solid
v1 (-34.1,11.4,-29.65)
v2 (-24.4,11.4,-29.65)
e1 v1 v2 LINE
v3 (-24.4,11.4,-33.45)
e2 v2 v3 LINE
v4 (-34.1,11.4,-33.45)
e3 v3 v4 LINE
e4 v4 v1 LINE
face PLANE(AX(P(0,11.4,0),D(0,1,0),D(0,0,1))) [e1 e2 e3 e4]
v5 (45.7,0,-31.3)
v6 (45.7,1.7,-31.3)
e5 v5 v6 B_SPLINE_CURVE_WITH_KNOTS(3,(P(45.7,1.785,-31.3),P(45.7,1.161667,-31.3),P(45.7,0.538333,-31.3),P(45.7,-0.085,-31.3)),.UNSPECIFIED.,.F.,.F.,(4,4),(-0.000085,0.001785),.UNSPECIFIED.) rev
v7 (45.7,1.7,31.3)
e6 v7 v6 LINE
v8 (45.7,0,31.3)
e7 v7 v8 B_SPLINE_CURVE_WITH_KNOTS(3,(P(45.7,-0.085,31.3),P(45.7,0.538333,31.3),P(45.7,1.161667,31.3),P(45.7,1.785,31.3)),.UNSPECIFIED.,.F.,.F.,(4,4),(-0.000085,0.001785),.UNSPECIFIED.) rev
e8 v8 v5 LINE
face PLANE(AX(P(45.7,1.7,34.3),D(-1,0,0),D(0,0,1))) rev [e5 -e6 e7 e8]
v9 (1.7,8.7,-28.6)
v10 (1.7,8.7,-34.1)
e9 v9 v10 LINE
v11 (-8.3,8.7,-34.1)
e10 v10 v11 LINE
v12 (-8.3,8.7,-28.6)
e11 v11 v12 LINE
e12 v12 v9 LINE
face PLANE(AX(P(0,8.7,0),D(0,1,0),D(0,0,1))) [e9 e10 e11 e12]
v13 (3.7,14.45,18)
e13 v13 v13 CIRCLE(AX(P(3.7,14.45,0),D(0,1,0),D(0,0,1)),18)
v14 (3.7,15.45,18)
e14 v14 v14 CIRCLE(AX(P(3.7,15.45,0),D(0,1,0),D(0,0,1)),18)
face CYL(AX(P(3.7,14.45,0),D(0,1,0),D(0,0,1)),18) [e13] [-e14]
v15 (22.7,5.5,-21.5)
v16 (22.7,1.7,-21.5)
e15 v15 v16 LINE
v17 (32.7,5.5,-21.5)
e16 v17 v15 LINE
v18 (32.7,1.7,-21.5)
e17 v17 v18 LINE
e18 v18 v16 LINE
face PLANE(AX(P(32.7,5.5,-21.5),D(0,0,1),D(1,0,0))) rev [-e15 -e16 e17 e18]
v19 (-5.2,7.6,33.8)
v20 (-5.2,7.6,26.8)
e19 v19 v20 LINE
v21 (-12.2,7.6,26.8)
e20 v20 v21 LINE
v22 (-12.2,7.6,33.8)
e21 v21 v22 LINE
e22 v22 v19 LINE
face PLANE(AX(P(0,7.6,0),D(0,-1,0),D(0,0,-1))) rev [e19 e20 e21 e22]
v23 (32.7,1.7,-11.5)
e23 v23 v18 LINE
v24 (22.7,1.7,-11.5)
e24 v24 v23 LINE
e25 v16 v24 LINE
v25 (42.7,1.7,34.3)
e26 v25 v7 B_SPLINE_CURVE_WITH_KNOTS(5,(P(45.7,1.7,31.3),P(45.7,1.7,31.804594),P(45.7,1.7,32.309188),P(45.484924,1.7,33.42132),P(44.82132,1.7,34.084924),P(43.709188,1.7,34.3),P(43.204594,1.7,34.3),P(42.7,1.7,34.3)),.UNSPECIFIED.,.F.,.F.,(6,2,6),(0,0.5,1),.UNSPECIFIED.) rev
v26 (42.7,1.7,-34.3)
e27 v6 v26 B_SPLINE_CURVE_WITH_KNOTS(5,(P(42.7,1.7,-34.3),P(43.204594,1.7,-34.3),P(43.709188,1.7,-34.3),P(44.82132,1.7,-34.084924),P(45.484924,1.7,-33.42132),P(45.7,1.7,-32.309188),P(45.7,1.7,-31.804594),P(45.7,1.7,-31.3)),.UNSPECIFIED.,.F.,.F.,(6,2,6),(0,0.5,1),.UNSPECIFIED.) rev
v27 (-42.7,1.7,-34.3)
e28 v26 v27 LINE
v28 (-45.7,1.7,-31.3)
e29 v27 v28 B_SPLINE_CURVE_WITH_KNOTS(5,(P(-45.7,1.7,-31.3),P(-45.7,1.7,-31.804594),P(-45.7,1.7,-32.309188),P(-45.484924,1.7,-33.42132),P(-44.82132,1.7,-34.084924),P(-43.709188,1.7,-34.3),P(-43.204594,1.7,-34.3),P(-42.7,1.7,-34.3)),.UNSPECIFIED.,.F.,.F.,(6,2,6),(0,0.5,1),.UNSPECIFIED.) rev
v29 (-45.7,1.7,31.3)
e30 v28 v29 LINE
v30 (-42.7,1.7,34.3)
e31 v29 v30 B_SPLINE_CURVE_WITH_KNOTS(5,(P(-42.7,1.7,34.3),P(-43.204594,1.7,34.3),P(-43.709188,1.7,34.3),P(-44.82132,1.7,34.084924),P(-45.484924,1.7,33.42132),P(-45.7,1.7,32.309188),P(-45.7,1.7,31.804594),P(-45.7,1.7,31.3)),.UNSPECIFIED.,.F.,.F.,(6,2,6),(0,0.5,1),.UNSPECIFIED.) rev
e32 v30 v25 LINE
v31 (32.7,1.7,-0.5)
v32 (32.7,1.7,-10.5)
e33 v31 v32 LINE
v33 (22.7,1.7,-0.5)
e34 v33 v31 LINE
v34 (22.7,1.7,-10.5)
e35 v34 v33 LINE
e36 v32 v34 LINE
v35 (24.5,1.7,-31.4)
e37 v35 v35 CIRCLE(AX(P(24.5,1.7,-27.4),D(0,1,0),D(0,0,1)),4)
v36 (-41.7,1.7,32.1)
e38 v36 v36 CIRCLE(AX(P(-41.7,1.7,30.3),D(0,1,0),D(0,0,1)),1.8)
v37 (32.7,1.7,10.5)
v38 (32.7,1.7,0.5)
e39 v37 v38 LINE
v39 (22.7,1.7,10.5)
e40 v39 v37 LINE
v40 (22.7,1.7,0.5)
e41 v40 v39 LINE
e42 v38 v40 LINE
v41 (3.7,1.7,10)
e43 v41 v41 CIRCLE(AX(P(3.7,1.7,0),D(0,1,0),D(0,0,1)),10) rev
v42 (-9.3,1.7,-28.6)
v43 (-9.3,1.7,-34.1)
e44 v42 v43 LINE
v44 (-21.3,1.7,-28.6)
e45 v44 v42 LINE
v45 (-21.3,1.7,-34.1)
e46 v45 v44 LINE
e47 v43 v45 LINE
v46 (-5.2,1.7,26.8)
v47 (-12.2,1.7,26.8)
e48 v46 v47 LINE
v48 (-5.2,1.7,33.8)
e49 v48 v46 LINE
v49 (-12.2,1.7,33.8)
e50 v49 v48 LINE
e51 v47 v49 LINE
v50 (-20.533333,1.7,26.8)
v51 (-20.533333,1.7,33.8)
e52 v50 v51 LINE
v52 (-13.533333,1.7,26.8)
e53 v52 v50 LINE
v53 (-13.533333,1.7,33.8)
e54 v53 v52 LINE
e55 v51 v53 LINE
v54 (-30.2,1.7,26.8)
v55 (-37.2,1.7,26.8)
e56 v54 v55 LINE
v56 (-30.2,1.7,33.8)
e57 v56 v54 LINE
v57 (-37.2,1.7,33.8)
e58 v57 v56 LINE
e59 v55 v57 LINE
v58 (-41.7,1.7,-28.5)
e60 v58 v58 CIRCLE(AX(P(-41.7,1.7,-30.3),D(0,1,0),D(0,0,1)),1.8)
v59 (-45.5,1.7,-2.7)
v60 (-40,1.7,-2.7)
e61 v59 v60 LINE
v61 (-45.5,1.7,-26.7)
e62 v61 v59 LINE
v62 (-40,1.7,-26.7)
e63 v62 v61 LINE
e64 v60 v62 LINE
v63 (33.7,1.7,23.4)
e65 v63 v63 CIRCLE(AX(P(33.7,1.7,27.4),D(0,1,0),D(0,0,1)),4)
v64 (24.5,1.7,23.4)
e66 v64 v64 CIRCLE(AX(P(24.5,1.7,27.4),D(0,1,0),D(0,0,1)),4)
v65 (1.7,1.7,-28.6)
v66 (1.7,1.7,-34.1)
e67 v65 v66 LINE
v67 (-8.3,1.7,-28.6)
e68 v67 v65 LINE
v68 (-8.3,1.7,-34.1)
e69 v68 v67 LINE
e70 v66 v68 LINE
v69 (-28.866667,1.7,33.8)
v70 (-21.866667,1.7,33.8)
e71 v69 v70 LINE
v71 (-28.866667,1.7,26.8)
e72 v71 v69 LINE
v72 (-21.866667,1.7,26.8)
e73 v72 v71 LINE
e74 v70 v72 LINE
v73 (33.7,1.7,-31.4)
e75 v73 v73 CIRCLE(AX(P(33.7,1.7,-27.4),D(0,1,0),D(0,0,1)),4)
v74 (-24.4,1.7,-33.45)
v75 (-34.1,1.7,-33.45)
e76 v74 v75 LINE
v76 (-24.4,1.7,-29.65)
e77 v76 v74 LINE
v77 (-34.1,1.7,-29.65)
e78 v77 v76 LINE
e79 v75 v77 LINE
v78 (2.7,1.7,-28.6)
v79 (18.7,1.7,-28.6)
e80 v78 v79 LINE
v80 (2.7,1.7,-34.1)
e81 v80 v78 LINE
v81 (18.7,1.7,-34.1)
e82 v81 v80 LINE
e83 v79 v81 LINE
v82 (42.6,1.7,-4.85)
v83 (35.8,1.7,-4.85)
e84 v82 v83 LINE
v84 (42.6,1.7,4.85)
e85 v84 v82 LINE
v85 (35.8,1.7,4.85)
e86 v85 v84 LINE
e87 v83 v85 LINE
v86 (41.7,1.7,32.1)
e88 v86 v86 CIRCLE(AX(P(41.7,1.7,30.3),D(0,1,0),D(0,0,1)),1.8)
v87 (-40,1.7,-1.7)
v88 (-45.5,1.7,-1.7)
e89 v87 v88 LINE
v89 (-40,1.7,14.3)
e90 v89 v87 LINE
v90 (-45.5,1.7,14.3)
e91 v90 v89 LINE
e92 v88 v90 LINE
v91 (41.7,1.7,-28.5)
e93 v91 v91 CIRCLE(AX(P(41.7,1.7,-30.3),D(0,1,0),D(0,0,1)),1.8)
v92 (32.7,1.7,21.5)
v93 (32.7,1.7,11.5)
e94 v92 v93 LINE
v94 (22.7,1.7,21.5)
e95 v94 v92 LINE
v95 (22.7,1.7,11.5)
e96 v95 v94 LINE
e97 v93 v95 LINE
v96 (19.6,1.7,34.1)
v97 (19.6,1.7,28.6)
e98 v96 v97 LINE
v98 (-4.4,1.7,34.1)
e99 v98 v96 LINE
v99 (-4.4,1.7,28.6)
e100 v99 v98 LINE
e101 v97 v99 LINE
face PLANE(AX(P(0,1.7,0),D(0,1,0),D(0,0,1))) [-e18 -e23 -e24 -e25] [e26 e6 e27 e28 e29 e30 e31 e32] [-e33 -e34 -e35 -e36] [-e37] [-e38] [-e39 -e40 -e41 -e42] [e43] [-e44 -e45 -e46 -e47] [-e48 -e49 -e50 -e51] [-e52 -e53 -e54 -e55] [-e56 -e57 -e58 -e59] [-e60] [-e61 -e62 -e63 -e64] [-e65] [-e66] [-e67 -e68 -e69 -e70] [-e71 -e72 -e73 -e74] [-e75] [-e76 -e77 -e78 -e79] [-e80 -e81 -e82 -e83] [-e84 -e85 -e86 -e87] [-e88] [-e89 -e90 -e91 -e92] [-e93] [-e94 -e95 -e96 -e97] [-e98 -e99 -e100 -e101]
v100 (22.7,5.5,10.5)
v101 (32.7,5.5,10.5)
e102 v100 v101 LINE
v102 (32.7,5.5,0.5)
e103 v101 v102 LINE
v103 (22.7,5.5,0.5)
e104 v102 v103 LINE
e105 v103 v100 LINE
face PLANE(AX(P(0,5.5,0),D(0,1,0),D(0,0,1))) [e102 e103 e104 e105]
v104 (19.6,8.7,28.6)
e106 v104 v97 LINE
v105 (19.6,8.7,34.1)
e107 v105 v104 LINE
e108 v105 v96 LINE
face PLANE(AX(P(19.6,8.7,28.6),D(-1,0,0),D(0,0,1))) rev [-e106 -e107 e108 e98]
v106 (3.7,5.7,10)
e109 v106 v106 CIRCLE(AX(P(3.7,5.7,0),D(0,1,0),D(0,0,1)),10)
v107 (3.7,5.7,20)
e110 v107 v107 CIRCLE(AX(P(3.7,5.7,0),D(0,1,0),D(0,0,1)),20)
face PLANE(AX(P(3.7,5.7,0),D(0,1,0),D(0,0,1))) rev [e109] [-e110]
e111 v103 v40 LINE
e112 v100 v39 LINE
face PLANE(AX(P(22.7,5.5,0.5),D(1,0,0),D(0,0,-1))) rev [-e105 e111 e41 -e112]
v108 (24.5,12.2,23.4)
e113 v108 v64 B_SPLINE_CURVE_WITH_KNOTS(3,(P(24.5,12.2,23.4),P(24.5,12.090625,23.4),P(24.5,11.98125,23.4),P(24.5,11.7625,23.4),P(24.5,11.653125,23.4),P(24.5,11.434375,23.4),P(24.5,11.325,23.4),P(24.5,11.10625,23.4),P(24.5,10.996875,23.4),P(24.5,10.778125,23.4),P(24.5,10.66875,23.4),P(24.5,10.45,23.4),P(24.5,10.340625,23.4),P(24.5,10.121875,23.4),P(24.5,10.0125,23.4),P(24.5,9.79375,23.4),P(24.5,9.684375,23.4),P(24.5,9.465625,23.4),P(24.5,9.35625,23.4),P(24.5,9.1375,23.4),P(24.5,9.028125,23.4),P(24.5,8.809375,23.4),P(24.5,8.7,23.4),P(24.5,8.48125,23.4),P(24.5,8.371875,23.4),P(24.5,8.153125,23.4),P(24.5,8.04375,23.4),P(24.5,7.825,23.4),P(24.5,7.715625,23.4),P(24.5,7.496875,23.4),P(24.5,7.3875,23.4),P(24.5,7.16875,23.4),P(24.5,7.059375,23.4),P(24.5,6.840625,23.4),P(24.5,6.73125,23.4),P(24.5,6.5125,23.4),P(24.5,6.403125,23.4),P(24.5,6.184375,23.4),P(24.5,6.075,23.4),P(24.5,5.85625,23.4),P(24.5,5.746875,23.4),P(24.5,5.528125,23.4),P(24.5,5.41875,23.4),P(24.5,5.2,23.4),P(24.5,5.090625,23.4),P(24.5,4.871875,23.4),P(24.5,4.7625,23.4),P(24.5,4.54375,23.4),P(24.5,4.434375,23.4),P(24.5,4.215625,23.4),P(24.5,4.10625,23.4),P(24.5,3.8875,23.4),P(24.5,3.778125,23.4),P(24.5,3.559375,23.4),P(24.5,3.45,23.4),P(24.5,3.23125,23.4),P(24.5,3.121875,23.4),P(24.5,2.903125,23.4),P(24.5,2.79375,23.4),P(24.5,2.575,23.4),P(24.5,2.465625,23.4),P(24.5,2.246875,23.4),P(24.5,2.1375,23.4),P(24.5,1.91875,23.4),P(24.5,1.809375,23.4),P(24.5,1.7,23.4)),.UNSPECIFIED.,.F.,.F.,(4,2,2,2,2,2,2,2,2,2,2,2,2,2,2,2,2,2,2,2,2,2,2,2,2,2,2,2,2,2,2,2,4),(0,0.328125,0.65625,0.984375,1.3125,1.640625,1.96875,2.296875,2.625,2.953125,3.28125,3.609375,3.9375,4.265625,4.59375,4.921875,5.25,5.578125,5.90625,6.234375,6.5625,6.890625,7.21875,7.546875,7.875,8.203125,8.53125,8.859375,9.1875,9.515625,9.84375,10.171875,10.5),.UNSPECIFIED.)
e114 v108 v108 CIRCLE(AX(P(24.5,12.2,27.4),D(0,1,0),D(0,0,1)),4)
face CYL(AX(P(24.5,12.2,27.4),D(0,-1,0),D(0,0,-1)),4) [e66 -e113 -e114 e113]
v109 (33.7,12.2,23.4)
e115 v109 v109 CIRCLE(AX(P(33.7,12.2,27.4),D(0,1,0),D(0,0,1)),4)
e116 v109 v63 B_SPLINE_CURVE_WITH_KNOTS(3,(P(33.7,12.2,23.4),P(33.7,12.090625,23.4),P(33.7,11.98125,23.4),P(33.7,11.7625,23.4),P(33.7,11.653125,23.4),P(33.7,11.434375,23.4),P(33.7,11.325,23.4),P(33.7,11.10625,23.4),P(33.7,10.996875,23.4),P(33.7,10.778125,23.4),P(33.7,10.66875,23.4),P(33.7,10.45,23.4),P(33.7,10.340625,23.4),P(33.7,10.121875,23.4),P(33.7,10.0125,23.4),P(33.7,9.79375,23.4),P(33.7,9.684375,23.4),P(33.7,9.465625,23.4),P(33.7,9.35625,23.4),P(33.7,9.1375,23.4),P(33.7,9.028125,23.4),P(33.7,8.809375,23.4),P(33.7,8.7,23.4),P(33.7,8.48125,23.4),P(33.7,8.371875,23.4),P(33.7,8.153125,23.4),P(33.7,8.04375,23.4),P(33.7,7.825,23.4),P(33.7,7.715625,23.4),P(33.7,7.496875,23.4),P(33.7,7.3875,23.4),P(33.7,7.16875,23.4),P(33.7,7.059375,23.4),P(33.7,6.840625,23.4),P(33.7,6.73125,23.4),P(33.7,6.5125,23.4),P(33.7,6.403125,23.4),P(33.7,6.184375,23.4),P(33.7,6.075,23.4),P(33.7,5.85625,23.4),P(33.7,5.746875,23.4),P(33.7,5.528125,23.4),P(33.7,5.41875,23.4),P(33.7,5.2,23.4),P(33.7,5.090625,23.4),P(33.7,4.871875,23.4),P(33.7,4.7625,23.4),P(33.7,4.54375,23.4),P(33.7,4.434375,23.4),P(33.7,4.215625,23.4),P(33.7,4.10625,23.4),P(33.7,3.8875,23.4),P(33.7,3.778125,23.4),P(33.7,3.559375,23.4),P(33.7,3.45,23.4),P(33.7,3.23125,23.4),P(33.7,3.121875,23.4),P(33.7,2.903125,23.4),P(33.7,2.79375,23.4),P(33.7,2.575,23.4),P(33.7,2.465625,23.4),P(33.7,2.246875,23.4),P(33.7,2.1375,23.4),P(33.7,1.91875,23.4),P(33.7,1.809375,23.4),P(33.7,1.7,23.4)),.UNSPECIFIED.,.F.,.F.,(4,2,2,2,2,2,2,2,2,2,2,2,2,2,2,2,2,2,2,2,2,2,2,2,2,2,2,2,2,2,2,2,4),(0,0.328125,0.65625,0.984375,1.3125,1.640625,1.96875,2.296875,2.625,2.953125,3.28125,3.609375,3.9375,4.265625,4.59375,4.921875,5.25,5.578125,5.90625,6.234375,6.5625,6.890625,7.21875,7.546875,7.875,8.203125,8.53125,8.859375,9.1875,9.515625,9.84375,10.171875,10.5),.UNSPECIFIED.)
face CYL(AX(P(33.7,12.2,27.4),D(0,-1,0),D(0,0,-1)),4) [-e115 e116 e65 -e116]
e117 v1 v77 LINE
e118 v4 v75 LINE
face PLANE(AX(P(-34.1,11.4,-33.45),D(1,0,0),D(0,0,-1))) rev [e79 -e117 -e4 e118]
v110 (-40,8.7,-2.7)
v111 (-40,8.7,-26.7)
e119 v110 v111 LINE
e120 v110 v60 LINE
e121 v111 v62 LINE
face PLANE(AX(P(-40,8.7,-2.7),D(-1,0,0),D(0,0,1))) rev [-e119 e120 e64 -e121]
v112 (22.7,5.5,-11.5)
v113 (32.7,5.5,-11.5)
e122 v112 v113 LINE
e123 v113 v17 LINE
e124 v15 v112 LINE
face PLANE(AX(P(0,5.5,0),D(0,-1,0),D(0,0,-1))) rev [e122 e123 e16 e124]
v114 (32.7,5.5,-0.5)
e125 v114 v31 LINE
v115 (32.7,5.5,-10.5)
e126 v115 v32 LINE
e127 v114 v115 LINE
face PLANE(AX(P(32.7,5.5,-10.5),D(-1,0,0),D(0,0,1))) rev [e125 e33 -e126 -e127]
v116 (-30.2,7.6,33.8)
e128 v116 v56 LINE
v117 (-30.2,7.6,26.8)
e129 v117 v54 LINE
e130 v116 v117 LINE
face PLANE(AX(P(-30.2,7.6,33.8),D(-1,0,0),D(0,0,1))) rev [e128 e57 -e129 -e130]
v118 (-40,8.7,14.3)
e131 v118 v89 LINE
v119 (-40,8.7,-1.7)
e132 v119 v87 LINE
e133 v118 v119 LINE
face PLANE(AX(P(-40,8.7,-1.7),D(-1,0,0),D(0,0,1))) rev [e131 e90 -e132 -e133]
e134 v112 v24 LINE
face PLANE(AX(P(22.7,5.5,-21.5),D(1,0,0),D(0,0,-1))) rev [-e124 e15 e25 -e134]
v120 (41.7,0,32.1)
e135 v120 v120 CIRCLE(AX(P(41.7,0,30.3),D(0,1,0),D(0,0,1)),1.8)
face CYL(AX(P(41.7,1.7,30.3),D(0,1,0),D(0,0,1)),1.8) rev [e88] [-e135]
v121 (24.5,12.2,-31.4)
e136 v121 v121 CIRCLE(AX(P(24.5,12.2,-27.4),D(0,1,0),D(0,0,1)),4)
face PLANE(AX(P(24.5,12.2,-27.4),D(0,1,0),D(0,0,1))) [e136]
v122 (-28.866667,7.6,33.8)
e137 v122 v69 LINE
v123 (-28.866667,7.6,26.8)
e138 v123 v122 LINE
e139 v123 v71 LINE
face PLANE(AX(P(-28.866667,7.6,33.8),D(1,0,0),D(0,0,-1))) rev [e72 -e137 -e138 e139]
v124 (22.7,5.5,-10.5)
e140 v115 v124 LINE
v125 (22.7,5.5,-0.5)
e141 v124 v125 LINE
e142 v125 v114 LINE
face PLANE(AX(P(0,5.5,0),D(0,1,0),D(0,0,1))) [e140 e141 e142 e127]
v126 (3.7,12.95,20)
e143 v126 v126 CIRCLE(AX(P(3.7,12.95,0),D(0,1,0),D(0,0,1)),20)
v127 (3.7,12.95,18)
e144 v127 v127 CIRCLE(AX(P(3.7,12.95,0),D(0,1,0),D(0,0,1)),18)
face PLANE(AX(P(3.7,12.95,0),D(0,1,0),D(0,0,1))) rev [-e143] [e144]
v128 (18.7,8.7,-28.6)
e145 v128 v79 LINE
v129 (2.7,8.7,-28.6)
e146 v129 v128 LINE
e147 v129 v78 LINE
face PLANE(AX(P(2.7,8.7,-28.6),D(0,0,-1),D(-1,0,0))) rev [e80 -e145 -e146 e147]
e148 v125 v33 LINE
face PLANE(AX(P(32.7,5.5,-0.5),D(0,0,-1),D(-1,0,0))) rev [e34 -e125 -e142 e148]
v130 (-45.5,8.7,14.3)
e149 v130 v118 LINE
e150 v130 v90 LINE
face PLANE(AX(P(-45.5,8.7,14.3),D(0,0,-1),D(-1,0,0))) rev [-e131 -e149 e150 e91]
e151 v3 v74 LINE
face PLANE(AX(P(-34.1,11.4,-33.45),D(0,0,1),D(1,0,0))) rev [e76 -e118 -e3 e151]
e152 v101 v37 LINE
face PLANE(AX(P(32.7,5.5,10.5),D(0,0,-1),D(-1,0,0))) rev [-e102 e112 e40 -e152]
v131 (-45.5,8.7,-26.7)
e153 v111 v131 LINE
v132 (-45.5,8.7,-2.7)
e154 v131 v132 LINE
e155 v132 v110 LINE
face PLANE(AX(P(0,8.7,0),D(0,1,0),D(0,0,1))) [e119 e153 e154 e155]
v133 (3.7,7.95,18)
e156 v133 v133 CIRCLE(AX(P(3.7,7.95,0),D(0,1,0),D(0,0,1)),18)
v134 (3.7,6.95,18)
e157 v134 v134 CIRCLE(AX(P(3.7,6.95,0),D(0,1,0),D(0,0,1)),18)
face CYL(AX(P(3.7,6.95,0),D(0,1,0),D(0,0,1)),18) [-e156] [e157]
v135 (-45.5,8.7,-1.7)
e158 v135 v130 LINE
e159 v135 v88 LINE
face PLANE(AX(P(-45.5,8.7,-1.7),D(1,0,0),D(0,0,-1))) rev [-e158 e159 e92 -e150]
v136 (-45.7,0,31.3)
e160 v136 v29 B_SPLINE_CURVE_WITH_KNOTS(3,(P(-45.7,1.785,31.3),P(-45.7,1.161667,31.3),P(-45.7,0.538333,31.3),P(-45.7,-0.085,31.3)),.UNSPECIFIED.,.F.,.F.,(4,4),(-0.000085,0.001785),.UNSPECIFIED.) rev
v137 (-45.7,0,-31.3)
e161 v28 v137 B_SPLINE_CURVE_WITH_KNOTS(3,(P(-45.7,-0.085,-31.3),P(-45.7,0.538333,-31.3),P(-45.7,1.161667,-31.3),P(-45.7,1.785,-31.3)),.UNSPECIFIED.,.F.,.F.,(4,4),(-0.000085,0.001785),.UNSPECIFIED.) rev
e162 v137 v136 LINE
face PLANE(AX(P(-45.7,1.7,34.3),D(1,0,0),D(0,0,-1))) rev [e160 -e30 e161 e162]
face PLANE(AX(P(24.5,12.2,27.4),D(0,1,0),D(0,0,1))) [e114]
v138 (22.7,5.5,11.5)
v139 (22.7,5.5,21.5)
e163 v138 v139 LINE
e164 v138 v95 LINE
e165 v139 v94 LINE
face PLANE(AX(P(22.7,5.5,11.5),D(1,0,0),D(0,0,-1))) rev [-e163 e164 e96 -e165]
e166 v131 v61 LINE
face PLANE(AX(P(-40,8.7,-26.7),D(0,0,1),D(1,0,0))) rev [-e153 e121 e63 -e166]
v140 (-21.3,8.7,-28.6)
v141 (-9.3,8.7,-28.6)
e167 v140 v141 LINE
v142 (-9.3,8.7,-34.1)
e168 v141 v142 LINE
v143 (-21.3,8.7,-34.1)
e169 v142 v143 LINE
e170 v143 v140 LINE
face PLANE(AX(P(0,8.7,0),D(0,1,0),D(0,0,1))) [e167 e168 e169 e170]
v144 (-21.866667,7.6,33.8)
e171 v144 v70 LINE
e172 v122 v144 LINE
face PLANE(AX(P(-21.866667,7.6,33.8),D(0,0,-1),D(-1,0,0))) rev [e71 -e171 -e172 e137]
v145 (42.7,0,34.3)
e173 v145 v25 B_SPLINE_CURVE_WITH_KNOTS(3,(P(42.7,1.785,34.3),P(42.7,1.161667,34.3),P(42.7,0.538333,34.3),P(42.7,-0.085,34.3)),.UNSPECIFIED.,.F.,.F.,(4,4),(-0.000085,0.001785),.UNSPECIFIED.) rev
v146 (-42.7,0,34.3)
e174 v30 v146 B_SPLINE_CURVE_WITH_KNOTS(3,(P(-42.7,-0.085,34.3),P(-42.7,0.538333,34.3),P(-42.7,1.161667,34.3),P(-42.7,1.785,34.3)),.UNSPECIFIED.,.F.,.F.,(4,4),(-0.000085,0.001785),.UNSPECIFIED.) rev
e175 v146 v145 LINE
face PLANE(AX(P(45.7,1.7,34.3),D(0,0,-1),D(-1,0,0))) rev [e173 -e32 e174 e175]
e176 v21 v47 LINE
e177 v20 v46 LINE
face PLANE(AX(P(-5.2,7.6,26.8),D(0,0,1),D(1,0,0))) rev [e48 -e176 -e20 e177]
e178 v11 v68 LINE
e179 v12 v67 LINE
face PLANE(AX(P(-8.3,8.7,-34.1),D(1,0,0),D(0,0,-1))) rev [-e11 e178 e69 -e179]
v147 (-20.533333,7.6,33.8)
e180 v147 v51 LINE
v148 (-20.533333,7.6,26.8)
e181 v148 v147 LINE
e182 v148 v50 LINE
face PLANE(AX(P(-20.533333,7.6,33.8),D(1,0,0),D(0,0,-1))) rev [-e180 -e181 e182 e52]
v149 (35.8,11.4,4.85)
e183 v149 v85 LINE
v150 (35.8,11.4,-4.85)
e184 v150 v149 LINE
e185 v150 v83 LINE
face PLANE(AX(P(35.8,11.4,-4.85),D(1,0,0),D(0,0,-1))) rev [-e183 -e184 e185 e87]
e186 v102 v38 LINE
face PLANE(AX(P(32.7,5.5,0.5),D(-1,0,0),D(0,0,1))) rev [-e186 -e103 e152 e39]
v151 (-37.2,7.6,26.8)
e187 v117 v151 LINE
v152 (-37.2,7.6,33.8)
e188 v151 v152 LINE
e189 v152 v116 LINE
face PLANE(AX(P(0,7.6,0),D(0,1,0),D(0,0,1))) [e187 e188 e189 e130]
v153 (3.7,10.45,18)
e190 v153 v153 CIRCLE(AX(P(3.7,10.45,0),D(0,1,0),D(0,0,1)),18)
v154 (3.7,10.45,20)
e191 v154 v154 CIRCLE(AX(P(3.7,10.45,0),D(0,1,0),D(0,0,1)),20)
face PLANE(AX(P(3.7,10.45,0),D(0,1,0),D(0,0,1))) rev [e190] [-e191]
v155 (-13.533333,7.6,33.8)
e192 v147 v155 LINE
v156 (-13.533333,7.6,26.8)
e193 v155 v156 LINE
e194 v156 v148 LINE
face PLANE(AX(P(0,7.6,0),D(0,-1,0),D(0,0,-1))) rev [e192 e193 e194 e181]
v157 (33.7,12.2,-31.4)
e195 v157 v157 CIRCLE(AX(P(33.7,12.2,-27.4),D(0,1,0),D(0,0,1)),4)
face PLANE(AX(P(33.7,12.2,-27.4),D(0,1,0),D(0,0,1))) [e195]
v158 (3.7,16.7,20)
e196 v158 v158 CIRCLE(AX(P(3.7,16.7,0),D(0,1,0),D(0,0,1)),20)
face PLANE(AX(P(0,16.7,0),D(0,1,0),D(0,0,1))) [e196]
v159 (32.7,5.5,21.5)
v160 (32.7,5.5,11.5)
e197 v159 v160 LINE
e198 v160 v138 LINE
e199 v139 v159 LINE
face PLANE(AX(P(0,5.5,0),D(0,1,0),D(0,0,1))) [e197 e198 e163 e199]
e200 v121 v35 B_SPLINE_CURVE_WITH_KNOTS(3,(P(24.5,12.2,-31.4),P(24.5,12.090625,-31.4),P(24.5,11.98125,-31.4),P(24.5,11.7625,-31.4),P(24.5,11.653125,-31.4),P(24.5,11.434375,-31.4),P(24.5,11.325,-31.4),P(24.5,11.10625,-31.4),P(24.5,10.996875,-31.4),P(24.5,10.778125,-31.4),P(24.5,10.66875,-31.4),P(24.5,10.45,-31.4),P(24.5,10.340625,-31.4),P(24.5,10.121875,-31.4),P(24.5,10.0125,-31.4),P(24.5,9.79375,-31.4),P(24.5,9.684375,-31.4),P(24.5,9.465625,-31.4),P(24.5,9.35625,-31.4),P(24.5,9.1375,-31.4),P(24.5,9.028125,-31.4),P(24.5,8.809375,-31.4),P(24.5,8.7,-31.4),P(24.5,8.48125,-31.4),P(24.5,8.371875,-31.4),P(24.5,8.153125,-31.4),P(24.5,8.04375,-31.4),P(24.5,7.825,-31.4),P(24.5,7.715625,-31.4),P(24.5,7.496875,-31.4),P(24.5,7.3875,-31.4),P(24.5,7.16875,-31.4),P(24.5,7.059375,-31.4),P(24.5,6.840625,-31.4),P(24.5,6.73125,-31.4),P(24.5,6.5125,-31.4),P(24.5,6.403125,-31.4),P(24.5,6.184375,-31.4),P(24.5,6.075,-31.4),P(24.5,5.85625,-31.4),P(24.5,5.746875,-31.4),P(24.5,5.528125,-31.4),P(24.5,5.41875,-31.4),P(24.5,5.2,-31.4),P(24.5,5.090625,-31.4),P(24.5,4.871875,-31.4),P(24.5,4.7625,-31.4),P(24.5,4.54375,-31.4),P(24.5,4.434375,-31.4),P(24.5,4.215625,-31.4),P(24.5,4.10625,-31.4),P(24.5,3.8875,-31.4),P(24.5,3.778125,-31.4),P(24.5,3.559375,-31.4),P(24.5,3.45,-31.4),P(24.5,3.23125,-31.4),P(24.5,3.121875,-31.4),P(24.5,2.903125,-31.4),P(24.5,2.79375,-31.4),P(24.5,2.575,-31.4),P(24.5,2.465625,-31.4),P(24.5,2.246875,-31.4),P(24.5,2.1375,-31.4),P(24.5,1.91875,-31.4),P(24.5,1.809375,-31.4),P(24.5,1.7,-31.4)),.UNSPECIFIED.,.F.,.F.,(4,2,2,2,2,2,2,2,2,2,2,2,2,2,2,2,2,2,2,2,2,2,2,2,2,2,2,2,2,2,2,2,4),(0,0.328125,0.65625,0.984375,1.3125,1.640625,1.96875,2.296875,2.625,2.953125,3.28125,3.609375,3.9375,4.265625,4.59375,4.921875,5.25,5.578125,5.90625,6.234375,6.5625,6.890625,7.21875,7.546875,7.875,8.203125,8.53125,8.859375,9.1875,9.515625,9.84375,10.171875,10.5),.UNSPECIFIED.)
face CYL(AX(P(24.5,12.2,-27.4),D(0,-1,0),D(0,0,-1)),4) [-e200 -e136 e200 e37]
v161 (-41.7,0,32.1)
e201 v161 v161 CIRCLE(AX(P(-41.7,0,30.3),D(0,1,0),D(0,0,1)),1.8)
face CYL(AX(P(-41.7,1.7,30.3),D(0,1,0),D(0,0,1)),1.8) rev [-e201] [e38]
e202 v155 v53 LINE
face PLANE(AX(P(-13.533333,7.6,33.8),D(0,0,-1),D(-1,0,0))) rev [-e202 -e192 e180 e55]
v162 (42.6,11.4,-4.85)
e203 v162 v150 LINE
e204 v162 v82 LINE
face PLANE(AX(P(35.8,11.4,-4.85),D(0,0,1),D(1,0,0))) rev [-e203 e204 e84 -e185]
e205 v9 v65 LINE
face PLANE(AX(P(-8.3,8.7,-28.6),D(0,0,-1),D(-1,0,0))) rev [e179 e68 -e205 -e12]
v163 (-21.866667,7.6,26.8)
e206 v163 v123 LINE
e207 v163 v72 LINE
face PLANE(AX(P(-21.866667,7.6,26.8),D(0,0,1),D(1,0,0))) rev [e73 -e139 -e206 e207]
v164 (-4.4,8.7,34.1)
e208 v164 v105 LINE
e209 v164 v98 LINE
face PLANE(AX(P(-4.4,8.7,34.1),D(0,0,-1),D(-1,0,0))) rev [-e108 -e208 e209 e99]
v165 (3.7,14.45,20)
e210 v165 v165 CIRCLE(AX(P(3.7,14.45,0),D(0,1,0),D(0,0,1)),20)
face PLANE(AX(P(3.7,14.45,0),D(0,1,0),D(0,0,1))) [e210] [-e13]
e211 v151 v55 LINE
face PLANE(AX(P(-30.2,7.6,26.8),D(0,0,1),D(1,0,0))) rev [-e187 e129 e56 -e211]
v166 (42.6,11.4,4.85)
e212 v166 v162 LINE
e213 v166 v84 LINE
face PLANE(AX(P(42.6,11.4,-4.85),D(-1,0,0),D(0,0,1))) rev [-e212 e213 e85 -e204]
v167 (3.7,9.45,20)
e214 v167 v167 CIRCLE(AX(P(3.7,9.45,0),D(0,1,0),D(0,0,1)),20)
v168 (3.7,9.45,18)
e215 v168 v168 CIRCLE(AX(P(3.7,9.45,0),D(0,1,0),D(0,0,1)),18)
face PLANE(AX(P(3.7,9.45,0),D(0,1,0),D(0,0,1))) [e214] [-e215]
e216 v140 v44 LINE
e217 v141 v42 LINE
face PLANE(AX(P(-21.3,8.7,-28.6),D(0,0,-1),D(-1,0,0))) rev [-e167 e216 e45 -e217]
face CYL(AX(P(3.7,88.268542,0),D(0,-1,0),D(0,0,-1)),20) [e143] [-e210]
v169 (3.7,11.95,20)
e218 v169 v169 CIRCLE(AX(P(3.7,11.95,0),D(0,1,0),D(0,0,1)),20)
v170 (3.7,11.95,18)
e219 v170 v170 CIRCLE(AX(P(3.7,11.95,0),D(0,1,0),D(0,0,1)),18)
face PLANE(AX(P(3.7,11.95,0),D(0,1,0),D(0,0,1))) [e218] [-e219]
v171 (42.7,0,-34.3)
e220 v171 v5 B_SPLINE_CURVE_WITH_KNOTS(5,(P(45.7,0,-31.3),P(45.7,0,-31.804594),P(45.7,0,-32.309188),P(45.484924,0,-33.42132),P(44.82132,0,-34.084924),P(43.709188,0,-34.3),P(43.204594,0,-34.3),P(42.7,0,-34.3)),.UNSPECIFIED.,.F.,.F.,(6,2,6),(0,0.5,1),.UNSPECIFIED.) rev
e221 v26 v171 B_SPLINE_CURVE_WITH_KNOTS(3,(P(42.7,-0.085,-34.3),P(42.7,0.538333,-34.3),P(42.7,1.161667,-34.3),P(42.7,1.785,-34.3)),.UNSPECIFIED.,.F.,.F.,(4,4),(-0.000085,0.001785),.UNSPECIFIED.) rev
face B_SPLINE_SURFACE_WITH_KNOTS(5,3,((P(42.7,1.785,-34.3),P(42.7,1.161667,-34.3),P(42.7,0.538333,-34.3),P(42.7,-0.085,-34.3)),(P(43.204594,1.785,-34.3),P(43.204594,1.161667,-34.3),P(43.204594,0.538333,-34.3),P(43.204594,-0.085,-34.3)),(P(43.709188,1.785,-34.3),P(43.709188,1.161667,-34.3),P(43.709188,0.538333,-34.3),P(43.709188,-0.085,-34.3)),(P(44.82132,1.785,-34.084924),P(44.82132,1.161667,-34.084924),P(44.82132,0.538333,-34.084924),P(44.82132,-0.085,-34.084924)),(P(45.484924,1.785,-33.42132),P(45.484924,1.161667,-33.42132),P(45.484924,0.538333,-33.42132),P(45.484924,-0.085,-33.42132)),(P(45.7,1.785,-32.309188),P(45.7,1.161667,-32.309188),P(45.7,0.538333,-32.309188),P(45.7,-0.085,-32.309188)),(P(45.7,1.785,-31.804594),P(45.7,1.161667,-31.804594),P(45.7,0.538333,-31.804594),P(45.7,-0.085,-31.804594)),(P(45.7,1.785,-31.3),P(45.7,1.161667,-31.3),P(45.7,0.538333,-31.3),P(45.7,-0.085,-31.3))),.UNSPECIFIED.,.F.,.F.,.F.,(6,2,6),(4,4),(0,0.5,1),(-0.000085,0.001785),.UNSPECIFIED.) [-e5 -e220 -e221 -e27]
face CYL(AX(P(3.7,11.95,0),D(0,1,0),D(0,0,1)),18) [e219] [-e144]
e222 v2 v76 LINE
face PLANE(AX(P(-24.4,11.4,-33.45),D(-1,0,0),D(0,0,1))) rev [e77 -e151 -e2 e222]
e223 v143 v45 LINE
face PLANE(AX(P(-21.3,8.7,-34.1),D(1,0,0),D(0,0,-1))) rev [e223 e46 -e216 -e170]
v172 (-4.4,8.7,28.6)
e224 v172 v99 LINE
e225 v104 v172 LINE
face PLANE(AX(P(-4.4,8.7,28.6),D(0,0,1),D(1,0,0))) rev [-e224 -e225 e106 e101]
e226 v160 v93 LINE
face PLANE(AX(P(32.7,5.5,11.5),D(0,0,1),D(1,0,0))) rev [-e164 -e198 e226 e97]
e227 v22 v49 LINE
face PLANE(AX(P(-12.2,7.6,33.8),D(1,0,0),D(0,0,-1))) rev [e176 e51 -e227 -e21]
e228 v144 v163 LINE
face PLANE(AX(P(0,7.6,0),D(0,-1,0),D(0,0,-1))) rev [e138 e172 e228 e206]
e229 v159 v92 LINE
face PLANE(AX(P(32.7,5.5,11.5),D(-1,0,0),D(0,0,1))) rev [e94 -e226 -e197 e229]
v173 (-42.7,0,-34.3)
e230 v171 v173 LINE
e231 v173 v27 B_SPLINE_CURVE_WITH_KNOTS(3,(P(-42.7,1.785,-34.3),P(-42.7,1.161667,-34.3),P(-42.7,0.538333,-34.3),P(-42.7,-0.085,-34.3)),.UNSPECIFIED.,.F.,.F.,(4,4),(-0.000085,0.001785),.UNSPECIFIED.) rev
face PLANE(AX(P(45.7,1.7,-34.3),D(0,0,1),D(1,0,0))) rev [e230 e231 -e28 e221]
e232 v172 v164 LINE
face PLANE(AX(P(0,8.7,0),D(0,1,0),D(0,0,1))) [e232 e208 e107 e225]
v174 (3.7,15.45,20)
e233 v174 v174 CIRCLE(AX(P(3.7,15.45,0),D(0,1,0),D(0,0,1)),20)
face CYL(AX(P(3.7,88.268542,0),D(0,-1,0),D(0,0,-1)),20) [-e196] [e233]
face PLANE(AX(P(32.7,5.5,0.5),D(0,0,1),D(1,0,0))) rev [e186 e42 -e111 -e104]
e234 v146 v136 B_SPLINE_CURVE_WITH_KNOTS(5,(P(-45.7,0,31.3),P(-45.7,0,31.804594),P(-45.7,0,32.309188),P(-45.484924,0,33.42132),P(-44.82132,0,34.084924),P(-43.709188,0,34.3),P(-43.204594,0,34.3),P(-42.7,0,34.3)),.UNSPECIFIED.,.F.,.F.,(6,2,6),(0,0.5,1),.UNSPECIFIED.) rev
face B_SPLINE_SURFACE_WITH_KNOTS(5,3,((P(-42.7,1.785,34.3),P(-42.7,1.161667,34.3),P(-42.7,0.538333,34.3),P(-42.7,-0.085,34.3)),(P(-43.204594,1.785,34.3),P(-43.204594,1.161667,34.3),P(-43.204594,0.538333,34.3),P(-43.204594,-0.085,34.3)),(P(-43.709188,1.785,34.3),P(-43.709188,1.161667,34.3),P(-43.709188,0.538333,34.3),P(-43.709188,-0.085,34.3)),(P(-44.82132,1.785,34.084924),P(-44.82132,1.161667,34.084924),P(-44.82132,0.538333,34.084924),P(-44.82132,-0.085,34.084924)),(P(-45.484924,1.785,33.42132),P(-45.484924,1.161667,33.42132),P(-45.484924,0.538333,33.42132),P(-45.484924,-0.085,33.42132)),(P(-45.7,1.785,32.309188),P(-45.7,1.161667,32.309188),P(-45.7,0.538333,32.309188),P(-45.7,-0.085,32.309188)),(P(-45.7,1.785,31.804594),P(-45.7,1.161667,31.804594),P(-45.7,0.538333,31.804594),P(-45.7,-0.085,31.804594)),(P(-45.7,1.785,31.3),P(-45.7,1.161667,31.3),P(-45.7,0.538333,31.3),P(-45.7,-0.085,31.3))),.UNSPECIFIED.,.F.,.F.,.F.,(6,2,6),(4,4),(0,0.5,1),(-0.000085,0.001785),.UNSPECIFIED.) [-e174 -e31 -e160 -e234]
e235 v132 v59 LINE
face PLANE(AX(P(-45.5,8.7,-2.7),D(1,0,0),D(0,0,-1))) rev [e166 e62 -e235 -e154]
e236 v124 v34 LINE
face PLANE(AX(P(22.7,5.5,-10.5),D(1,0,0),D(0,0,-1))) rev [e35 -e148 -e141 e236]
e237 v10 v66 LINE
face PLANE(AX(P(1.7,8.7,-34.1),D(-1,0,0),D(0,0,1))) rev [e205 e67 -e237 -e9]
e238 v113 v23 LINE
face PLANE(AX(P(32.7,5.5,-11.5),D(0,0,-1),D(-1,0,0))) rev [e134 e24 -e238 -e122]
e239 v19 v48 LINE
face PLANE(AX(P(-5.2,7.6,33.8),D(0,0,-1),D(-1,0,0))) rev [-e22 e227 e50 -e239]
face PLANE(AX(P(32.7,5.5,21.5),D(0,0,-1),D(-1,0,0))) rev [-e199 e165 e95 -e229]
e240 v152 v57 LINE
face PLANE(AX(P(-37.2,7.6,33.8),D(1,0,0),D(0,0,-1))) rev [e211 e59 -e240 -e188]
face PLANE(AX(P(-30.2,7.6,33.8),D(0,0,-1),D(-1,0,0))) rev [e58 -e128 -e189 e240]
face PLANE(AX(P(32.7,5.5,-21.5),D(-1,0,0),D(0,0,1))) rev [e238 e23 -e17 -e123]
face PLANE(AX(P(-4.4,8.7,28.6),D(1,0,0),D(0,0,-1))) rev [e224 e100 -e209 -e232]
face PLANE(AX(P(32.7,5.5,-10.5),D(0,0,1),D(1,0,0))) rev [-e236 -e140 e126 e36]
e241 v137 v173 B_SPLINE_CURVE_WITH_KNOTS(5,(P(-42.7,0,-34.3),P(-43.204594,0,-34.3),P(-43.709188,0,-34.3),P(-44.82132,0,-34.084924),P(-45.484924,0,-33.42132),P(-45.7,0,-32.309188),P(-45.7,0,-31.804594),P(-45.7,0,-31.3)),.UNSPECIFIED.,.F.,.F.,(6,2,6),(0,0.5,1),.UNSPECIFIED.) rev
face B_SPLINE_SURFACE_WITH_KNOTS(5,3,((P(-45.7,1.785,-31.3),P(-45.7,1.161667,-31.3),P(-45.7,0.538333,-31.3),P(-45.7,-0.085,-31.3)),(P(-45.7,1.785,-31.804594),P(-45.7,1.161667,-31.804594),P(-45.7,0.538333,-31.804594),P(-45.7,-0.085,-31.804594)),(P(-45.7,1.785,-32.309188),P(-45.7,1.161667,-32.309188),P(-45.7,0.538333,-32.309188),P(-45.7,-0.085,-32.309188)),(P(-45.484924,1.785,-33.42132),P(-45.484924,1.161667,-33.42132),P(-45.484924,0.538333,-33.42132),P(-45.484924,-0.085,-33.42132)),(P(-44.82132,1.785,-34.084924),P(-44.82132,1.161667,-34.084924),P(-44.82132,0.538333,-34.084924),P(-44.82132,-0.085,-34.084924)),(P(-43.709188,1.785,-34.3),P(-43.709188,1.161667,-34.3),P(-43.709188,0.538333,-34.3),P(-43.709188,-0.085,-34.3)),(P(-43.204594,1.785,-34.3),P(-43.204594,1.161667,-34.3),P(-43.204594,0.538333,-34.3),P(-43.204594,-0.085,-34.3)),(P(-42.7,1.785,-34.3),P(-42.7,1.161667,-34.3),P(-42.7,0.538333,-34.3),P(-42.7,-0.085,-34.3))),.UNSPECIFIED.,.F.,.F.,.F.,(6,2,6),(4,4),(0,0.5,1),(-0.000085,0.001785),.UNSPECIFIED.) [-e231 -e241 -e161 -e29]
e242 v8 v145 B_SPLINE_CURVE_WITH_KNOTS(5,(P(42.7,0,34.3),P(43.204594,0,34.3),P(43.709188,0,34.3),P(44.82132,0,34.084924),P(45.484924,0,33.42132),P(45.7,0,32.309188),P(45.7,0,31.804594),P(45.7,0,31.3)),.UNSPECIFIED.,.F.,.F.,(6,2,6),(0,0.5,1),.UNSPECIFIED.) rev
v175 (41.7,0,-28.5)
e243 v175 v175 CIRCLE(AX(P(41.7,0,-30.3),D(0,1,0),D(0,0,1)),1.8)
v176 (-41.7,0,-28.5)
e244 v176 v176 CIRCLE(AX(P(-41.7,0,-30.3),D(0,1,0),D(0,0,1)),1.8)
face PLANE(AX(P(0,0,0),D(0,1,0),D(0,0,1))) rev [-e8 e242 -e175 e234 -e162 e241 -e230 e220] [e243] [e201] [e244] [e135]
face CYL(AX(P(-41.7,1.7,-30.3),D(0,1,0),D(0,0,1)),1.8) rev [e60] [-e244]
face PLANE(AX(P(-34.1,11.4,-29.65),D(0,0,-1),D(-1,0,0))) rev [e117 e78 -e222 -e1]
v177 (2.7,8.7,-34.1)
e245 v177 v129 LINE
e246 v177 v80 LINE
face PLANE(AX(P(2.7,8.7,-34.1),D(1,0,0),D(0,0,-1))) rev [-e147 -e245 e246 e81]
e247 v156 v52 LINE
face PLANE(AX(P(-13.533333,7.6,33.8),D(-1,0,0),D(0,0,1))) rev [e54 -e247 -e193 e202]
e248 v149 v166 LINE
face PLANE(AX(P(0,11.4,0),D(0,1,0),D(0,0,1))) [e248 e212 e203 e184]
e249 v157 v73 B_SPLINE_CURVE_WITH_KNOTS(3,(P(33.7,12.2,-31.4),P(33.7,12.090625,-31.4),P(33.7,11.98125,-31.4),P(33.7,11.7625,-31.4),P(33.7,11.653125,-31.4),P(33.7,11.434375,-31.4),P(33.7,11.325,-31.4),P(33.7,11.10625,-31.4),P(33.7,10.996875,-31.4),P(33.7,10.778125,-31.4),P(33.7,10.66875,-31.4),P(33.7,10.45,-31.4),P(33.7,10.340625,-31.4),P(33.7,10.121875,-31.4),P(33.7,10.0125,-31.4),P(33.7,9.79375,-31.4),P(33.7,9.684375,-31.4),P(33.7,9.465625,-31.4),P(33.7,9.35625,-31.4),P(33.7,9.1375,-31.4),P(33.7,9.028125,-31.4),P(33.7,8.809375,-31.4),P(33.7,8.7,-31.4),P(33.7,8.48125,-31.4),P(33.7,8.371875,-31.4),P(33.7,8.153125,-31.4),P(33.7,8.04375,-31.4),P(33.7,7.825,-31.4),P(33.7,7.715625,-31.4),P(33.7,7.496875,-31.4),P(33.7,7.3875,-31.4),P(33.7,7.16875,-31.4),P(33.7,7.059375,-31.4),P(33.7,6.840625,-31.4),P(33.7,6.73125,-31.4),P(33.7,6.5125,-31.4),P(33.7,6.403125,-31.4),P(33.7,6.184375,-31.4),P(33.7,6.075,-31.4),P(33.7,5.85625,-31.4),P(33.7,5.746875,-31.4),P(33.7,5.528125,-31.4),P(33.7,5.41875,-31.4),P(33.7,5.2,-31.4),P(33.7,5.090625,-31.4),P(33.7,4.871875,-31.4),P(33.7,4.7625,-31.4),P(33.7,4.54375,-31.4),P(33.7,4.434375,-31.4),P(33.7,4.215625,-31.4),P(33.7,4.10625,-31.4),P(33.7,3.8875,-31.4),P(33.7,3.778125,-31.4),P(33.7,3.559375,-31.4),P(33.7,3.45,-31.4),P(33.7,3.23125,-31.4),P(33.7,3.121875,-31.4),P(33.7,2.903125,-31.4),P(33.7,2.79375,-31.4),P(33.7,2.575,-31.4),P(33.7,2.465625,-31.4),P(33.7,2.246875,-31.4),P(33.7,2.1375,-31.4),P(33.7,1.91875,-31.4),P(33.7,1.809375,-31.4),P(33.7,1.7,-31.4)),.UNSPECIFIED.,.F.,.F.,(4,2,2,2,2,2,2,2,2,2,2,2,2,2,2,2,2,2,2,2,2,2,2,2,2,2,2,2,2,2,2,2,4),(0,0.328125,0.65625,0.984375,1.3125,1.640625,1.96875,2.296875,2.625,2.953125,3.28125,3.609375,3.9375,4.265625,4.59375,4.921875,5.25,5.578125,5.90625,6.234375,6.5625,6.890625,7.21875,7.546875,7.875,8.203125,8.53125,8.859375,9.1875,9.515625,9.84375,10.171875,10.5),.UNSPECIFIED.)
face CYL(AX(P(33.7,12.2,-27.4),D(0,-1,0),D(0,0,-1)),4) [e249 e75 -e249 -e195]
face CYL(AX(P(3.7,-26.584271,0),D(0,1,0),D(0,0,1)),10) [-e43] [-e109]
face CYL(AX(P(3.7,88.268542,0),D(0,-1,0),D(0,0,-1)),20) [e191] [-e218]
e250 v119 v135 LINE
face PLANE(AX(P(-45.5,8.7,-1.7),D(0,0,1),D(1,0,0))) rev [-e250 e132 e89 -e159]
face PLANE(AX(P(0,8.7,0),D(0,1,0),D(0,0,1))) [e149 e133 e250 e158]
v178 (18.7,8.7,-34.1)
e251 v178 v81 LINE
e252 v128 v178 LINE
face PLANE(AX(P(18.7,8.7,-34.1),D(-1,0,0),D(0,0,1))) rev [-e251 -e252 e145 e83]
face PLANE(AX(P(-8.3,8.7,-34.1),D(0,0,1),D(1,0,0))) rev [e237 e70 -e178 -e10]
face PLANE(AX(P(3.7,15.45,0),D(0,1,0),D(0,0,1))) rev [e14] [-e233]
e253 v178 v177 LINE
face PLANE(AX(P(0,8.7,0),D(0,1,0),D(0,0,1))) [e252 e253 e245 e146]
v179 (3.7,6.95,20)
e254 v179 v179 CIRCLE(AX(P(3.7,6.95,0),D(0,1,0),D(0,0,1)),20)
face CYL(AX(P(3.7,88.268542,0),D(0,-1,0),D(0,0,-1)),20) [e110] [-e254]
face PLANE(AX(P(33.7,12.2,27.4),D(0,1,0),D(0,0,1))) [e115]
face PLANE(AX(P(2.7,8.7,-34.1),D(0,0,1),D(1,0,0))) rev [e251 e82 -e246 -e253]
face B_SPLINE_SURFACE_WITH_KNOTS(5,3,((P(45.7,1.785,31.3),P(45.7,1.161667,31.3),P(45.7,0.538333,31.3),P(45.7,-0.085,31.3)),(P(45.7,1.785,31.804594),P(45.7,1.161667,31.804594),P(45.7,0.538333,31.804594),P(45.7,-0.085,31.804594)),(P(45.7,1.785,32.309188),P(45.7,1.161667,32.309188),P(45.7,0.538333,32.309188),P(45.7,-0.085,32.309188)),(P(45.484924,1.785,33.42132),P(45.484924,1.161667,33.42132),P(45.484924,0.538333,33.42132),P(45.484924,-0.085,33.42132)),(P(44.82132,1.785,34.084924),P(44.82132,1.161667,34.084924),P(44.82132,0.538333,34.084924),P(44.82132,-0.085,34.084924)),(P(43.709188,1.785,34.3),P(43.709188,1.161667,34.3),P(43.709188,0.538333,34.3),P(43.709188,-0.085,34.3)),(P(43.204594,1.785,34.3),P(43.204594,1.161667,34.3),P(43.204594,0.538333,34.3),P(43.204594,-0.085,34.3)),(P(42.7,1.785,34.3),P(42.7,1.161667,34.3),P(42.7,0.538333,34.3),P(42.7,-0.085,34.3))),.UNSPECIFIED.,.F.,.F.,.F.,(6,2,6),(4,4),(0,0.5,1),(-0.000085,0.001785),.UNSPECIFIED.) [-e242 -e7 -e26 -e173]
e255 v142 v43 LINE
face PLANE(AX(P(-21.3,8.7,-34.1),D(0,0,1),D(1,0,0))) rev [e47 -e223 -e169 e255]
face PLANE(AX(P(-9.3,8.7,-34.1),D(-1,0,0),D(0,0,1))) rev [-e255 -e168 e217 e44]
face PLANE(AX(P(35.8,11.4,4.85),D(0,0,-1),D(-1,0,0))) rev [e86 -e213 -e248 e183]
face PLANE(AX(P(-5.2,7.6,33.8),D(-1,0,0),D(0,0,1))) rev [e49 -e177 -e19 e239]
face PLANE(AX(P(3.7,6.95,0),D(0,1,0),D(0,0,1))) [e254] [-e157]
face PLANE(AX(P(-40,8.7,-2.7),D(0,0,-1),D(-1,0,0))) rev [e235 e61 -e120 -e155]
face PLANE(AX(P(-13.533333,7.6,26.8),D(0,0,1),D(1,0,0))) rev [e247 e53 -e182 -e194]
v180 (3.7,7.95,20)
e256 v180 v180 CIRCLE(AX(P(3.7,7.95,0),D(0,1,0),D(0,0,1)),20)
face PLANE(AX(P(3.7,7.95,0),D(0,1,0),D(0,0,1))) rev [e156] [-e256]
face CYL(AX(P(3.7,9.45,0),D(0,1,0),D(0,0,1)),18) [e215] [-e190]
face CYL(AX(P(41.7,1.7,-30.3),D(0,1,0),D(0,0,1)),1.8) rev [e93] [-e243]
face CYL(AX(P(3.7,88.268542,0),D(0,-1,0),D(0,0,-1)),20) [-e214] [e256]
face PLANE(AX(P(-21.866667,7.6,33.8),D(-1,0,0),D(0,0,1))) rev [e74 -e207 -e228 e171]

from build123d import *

# Parameters (mm, degrees)
SKETCH1_W                = 91.4
SKETCH1_H                = 68.6
BOSS_EXTRUDE1_DEPTH      = 1.7
BOSS_EXTRUDE2_START      = 4
SKETCH2_R                = 20
BOSS_EXTRUDE2_DEPTH      = 11
SKETCH3_R                = 4
BOSS_EXTRUDE3_DEPTH      = 10.5
SKETCH4_W                = 10
SKETCH4_H                = 10
BOSS_EXTRUDE4_DEPTH      = 3.8
SKETCH6_R                = 10
BOSS_EXTRUDE5_DEPTH      = 15
SKETCH7_W                = 6.8
SKETCH7_H                = 9.7
SKETCH7_W_2              = 9.7
SKETCH7_H_2              = 3.8
BOSS_EXTRUDE6_DEPTH      = 9.7
SKETCH8_W                = 24
SKETCH8_H                = 5.5
SKETCH8_W_2              = 5.5
SKETCH8_H_2              = 24
SKETCH8_H_3              = 16
SKETCH8_W_3              = 12
SKETCH8_W_4              = 10
SKETCH8_W_5              = 16
BOSS_EXTRUDE7_DEPTH      = 7
SKETCH9_W                = 7
SKETCH9_H                = 7
BOSS_EXTRUDE8_DEPTH      = 5.9
M3_CLEARANCE_HOLE1_D     = 3.6
M3_CLEARANCE_HOLE1_DEPTH = 7.5
M3_CLEARANCE_HOLE1_TIP   = 1.081549114
FILLET1_SIZE             = 3
CUT_EXTRUDE1_START       = -2.25
SKETCH12_R               = 20
SKETCH12_R_2             = 18
CUT_EXTRUDE1_DEPTH       = 1
LPATTERN1_COUNT          = 4
LPATTERN1_PITCH          = 2.5


with BuildPart() as part:
    # Sketch1 → Boss-Extrude1 (new body)
    with BuildSketch(Plane(origin=(0, 0, 0), x_dir=(1, 0, 0), z_dir=(0, 1, 0))):
        Rectangle(SKETCH1_W, SKETCH1_H)
    extrude(amount=BOSS_EXTRUDE1_DEPTH)

    # Sketch3 → Boss-Extrude3 (add)
    with BuildSketch(Plane(origin=(0, 1.7, 0), x_dir=(1, 0, 0), z_dir=(0, 1, 0))):
        with Locations(Location((24.5, 27.4, 0), (0, 0, 90))):
            Circle(SKETCH3_R)
        with Locations(Location((33.7, 27.4, 0), (0, 0, 90))):
            Circle(SKETCH3_R)
        with Locations(Location((33.7, -27.4, 0), (0, 0, 90))):
            Circle(SKETCH3_R)
        with Locations(Location((24.5, -27.4, 0), (0, 0, 90))):
            Circle(SKETCH3_R)
    extrude(amount=BOSS_EXTRUDE3_DEPTH)

    # Sketch4 → Boss-Extrude4 (add)
    with BuildSketch(Plane(origin=(0, 1.7, 0), x_dir=(1, 0, 0), z_dir=(0, 1, 0))):
        with Locations((27.7, 5.5)):
            Rectangle(SKETCH4_W, SKETCH4_H)
        with Locations((27.7, 16.5)):
            Rectangle(SKETCH4_W, SKETCH4_H)
        with Locations((27.7, -5.5)):
            Rectangle(SKETCH4_W, SKETCH4_H)
        with Locations((27.7, -16.5)):
            Rectangle(SKETCH4_W, SKETCH4_H)
    extrude(amount=BOSS_EXTRUDE4_DEPTH)



with BuildPart() as body_2:
    # Sketch2 → Boss-Extrude2 (new body)
    with BuildSketch(Plane(origin=(0, 1.7, 0), x_dir=(1, 0, 0), z_dir=(0, 1, 0)).offset(BOSS_EXTRUDE2_START)):
        with Locations(Location((3.7, 0, 0), (0, 0, 270))):
            Circle(SKETCH2_R)
    extrude(amount=BOSS_EXTRUDE2_DEPTH)


with BuildPart() as part_1:
    add(part.part)

    add(body_2.part)  # Boss-Extrude5 merges body 2
    # Sketch6 → Boss-Extrude5 (add)
    with BuildSketch(Plane(origin=(0, 16.7, 0), x_dir=(1, 0, 0), z_dir=(0, 1, 0))):
        with Locations(Location((3.7, 0, 0), (0, 0, 270))):
            Circle(SKETCH6_R)
    extrude(amount=-BOSS_EXTRUDE5_DEPTH)

    # Sketch7 → Boss-Extrude6 (add)
    with BuildSketch(Plane(origin=(0, 1.7, 0), x_dir=(1, 0, 0), z_dir=(0, 1, 0))):
        with Locations((39.2, 0)):
            Rectangle(SKETCH7_W, SKETCH7_H)
        with Locations((-29.25, 31.55)):
            Rectangle(SKETCH7_W_2, SKETCH7_H_2)
    extrude(amount=BOSS_EXTRUDE6_DEPTH)

    # Sketch8 → Boss-Extrude7 (add)
    with BuildSketch(Plane(origin=(0, 1.7, 0), x_dir=(1, 0, 0), z_dir=(0, 1, 0))):
        with Locations((7.6, -31.35)):
            Rectangle(SKETCH8_W, SKETCH8_H)
        with Locations((-42.75, 14.7)):
            Rectangle(SKETCH8_W_2, SKETCH8_H_2)
        with Locations((-42.75, -6.3)):
            Rectangle(SKETCH8_W_2, SKETCH8_H_3)
        with Locations((-15.3, 31.35)):
            Rectangle(SKETCH8_W_3, SKETCH8_H)
        with Locations((-3.3, 31.35)):
            Rectangle(SKETCH8_W_4, SKETCH8_H)
        with Locations((10.7, 31.35)):
            Rectangle(SKETCH8_W_5, SKETCH8_H)
    extrude(amount=BOSS_EXTRUDE7_DEPTH)

    # Sketch9 → Boss-Extrude8 (add)
    with BuildSketch(Plane(origin=(0, 1.7, 0), x_dir=(1, 0, 0), z_dir=(0, 1, 0))):
        with Locations((-33.7, -30.3)):
            Rectangle(SKETCH9_W, SKETCH9_H)
        with Locations((-25.366666667, -30.3)):
            Rectangle(SKETCH9_W, SKETCH9_H)
        with Locations((-17.033333333, -30.3)):
            Rectangle(SKETCH9_W, SKETCH9_H)
        with Locations((-8.7, -30.3)):
            Rectangle(SKETCH9_W, SKETCH9_H)
    extrude(amount=BOSS_EXTRUDE8_DEPTH)

    # M3 Clearance Hole1
    with Locations(Plane(origin=(0, 1.7, 0), x_dir=(1, 0, 0), z_dir=(0, 1, 0))):
        with Locations((41.7, 30.3), (-41.7, -30.3), (41.7, -30.3), (-41.7, 30.3)):
            Hole(M3_CLEARANCE_HOLE1_D / 2, depth=M3_CLEARANCE_HOLE1_DEPTH)
            with Locations((0, 0, -(M3_CLEARANCE_HOLE1_DEPTH + M3_CLEARANCE_HOLE1_TIP / 2))):  # 118° drill point
                Cone(0, M3_CLEARANCE_HOLE1_D / 2, M3_CLEARANCE_HOLE1_TIP, mode=Mode.SUBTRACT)

    # Fillet1
    # a fillet whose section is not a circle: 3 mm, written as the material it takes off along each edge
    with BuildSketch(Plane(origin=(-45.7, -7.5, 34.3), x_dir=(1, 0, 0), z_dir=(0, 1, 0)), Plane(origin=(-45.7, -7.5, -34.3), x_dir=(0, 0, 1), z_dir=(0, 1, 0))) as fillet1_piece_1:
        with BuildLine():
            add(Edge.make_bspline([(FILLET1_SIZE, 0), (FILLET1_SIZE * 0.831801948466, 0), (FILLET1_SIZE * 0.663603896932, 0), (FILLET1_SIZE * 0.292893218813, FILLET1_SIZE * 0.0716919198361), (FILLET1_SIZE * 0.0716919198361, FILLET1_SIZE * 0.292893218813), (0, FILLET1_SIZE * 0.663603896932), (0, FILLET1_SIZE * 0.831801948466), (0, FILLET1_SIZE)], knots=[0, 0, 0, 0, 0, 0, 0.5, 0.5, 1, 1, 1, 1, 1, 1], degree=5))
            Line((0, FILLET1_SIZE), (0, 0))
            Line((0, 0), (FILLET1_SIZE, 0))
        make_face()
    extrude(amount=16.7, mode=Mode.SUBTRACT)
    with BuildSketch(Plane(origin=(45.7, -7.5, -34.3), x_dir=(0, 0, 1), z_dir=(0, 1, 0)), Plane(origin=(45.7, -7.5, 34.3), x_dir=(-1, 0, 0), z_dir=(0, 1, 0))) as fillet1_piece_2:
        with BuildLine():
            add(Edge.make_bspline([(FILLET1_SIZE, 0), (FILLET1_SIZE * 0.831801948466, 0), (FILLET1_SIZE * 0.663603896932, 0), (FILLET1_SIZE * 0.292893218813, -FILLET1_SIZE * 0.0716919198361), (FILLET1_SIZE * 0.0716919198361, -FILLET1_SIZE * 0.292893218813), (0, -FILLET1_SIZE * 0.663603896932), (0, -FILLET1_SIZE * 0.831801948466), (0, -FILLET1_SIZE)], knots=[0, 0, 0, 0, 0, 0, 0.5, 0.5, 1, 1, 1, 1, 1, 1], degree=5))
            Line((0, -FILLET1_SIZE), (0, 0))
            Line((0, 0), (FILLET1_SIZE, 0))
        make_face()
    extrude(amount=16.7, mode=Mode.SUBTRACT)

    # Sketch12 → Cut-Extrude1 (cut)
    with BuildSketch(Plane(origin=(0, 16.7, 0), x_dir=(1, 0, 0), z_dir=(0, 1, 0)).offset(CUT_EXTRUDE1_START)):
        with Locations(Location((3.7, 0, 0), (0, 0, 270))):
            Circle(SKETCH12_R)
        with Locations(Location((3.7, 0, 0), (0, 0, 270))):
            Circle(SKETCH12_R_2, mode=Mode.SUBTRACT)
    cut_extrude1 = extrude(amount=CUT_EXTRUDE1_DEPTH, mode=Mode.SUBTRACT)

    # LPattern1: Cut-Extrude1 ×4
    with Locations(*[(0, -i * LPATTERN1_PITCH, 0) for i in range(1, LPATTERN1_COUNT)]):
        add(cut_extrude1, mode=Mode.SUBTRACT)


solid = part_1.part
